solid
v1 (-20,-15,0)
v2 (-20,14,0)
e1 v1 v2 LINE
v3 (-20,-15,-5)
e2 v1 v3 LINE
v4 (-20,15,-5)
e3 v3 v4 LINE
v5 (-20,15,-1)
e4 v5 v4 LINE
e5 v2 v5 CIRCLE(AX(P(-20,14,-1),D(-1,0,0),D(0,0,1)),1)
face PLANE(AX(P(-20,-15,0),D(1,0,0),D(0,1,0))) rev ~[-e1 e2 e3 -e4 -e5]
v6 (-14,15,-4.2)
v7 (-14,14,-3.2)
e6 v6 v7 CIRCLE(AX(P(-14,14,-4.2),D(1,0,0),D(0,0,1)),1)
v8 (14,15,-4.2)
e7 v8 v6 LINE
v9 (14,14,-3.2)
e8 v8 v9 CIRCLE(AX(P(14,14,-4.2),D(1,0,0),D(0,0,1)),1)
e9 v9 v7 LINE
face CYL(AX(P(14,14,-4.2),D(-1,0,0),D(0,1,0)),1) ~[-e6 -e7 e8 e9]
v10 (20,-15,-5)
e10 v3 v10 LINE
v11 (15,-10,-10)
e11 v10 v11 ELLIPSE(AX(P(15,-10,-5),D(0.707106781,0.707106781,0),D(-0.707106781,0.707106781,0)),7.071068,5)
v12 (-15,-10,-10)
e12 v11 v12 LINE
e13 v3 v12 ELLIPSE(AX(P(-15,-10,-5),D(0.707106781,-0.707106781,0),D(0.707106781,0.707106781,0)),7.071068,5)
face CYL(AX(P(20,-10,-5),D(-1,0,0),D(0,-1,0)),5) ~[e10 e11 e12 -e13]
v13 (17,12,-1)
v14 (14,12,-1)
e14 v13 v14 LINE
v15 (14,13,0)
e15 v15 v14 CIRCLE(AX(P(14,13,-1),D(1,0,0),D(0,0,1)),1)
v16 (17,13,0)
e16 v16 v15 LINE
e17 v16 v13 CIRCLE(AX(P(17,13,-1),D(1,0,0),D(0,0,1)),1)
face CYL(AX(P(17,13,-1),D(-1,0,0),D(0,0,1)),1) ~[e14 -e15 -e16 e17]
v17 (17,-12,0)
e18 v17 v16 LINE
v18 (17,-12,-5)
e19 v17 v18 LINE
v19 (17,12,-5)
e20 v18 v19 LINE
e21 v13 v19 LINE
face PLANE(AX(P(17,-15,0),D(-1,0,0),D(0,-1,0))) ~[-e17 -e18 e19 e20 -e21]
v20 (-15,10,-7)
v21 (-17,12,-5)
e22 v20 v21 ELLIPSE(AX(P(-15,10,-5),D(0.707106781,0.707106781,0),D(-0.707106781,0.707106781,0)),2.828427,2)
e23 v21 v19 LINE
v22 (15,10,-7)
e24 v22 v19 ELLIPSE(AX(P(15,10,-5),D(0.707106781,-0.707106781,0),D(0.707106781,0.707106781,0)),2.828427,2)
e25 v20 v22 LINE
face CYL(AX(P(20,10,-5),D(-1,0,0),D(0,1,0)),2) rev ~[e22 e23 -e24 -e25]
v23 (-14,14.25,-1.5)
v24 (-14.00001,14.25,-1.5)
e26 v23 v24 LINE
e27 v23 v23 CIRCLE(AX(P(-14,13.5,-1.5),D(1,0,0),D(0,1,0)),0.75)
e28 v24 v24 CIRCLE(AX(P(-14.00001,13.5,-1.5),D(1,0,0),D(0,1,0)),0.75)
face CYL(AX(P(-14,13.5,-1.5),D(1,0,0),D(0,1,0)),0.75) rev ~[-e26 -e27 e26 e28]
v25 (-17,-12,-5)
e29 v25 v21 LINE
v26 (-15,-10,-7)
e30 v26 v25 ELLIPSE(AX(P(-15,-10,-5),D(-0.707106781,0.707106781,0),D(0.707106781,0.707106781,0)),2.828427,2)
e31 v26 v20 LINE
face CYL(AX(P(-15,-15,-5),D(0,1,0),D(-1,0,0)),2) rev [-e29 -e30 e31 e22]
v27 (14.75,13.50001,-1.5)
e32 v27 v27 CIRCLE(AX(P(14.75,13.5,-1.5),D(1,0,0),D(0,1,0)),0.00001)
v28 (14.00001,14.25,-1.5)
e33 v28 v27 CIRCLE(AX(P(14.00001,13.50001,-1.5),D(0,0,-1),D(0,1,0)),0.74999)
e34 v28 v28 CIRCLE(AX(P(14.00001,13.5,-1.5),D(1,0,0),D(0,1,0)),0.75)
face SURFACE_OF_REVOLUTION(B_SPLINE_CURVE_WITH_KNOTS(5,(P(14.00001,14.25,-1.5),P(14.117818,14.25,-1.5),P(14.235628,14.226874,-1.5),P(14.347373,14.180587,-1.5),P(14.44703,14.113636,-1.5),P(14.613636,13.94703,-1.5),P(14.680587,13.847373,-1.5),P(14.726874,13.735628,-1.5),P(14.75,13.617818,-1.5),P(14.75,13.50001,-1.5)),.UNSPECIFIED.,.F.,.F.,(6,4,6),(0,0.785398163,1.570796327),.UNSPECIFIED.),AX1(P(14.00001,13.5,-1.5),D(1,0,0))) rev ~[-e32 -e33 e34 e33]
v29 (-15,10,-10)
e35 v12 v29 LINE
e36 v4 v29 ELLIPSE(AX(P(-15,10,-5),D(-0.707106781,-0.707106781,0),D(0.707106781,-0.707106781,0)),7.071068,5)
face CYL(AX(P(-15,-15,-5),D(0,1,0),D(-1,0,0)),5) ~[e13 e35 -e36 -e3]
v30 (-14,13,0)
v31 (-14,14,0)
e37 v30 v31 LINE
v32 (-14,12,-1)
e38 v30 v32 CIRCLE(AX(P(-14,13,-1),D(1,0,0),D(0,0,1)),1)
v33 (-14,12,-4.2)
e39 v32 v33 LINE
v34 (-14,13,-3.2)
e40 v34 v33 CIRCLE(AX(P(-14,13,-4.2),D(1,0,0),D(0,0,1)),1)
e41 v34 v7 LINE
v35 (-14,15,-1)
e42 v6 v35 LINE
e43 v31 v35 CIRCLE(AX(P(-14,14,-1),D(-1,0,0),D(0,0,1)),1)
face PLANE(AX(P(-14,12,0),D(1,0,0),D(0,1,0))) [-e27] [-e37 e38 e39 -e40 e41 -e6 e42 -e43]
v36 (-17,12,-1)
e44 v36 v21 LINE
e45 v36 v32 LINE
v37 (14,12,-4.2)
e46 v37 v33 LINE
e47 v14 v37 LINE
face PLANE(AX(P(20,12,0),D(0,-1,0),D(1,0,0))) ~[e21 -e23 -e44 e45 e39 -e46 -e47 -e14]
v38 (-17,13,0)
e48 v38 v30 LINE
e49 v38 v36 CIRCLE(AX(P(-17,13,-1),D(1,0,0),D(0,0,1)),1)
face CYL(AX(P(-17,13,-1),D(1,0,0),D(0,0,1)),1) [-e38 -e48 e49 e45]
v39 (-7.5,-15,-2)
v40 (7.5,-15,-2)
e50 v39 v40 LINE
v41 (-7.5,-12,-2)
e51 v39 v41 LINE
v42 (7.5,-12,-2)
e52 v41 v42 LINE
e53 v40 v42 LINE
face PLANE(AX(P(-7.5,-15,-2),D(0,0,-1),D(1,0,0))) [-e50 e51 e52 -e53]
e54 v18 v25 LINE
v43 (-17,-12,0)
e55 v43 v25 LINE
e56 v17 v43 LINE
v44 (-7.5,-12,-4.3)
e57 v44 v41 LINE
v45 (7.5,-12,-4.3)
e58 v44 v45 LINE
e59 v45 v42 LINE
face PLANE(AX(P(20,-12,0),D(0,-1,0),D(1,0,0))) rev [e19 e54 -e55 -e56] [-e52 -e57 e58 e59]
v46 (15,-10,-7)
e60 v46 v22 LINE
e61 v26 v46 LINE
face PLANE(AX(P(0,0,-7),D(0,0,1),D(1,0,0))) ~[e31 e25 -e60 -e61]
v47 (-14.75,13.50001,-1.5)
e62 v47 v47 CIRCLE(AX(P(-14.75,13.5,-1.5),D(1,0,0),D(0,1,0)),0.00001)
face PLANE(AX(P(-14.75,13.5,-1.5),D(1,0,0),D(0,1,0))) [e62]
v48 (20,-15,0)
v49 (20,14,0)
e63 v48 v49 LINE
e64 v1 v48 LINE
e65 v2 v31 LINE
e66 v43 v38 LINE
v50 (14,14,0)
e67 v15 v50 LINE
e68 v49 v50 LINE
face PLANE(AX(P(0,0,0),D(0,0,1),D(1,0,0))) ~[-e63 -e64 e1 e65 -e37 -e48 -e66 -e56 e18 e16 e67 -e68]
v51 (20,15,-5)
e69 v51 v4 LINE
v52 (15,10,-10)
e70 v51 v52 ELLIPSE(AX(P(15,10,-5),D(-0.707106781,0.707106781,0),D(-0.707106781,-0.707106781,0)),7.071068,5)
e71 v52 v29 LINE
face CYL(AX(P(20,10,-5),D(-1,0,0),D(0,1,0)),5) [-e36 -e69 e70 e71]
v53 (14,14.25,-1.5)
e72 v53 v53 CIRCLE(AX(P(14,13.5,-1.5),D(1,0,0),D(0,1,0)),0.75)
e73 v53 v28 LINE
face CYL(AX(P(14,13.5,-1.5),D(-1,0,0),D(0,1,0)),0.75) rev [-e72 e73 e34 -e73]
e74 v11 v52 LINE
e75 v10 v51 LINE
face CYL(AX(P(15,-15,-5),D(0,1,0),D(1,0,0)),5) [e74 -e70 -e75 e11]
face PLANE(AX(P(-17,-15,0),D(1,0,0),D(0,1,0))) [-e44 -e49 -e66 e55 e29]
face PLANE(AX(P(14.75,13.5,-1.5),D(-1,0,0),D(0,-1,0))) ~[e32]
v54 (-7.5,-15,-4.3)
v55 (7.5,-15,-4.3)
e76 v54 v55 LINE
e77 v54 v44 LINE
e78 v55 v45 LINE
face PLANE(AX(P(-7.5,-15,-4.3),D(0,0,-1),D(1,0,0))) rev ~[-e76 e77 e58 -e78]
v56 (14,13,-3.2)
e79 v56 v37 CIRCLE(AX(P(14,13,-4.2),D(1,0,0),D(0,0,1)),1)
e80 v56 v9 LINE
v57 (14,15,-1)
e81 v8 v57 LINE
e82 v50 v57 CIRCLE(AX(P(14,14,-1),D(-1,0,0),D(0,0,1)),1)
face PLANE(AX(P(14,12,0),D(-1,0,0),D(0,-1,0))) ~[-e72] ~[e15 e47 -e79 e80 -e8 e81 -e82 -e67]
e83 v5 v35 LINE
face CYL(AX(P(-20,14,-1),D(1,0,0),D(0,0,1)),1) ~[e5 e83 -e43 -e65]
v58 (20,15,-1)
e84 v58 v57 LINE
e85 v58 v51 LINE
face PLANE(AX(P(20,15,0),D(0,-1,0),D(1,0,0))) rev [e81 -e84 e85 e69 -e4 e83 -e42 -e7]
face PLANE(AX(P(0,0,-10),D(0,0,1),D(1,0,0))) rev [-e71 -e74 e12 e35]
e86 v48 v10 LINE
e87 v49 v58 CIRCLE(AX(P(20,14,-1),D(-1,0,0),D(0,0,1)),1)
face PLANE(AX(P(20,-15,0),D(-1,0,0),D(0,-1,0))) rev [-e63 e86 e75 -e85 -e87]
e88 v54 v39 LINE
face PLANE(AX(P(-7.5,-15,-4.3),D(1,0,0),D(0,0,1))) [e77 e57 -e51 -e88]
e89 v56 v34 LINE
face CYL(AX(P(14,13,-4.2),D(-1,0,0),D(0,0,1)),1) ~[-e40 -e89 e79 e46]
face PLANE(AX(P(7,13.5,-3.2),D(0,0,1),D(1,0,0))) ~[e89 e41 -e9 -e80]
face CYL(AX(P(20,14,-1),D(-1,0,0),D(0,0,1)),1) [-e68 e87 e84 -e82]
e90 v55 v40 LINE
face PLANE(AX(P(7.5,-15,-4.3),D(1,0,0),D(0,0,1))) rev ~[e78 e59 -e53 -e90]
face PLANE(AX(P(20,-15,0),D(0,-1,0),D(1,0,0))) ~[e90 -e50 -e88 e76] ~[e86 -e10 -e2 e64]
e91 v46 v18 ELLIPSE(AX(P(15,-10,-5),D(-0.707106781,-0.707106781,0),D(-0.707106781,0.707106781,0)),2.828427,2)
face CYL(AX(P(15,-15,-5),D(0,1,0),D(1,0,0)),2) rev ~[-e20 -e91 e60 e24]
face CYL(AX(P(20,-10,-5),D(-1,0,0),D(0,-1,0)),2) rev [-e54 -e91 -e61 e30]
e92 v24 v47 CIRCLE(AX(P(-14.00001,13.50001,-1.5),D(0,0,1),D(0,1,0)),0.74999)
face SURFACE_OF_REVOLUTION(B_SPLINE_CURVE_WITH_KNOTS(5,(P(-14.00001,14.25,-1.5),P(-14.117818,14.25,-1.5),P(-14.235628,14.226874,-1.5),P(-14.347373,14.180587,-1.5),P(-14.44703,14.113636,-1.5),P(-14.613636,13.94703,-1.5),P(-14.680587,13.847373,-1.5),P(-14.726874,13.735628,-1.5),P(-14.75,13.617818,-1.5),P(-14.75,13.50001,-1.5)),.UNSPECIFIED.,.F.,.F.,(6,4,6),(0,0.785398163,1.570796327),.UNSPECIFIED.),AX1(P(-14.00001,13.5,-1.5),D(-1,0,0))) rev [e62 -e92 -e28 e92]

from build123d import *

# Parameters (mm, degrees)
F0_W      = 40
F0_H      = 30
F1_DEPTH  = 10
F2_R      = 5
F3_T      = -3
F4_W      = 28
F4_H      = 3
F5_DEPTH  = 3
F6_W      = 32.3581136763
F6_H      = 60.2468792349
F7_DEPTH  = 25
F8_R      = 0.75
F9_DEPTH  = 0.75
F10_R     = 0.74999
F11_W     = 14
F11_H     = 3
F12_DEPTH = 0.2
F13_R     = 1
F15_W     = 15
F15_H     = 2.3
F16_DEPTH = 3


# Not quite as in the source:
# - a fillet or chamfer is up to 0.001 mm smaller than in the source, because OpenCascade refuses the exact size


with BuildPart() as f1:
    # F0 (on Top) → F1 (new body)
    with BuildSketch(Plane.XY):
        Rectangle(F0_W, F0_H)
    extrude(amount=-F1_DEPTH)

    # F2
    f2_edges = [f1.edges().sort_by_distance(p)[0] for p in [
        (20, 0, -10),
        (0, 15, -10),
        (-20, 0, -10),
        (0, -15, -10),
    ]]
    fillet(f2_edges, radius=F2_R)

    # F3
    f3_openings = [f1.faces().sort_by_distance(p)[0] for p in [
        (0, 0, 0),
    ]]
    offset(amount=F3_T, openings=f3_openings)

    # F4 (on face) → F5 (cut)
    with BuildSketch(Plane.XY):
        with Locations((0, 13.5)):
            Rectangle(F4_W, F4_H)
    extrude(amount=-F5_DEPTH, mode=Mode.SUBTRACT)

    # F6 (on Top) → F7 (cut)
    with BuildSketch(Plane.XY):
        with Locations((16.1790568382, -2.0559011027)):
            Rectangle(F6_W, F6_H)
    extrude(amount=-F7_DEPTH, mode=Mode.SUBTRACT)

    # F8 (on face) → F9 (cut)
    with BuildSketch(Plane.YZ.offset(-14)):
        with Locations((13.5, -1.5)):
            Circle(F8_R)
    extrude(amount=-F9_DEPTH, mode=Mode.SUBTRACT)

    # F10 (radius 0.75 in the source; OpenCascade refuses exactly that, so slightly less here)
    f10_edges = [f1.edges().sort_by_distance(p)[0] for p in [
        (-14.75, 12.75, -1.5),
    ]]
    fillet(f10_edges, radius=F10_R)

    # F11 (on face) → F12 (cut)
    with BuildSketch(Plane.XY.offset(-3)):
        with Locations((-7, 13.5)):
            Rectangle(F11_W, F11_H)
    extrude(amount=-F12_DEPTH, mode=Mode.SUBTRACT)

    # F13
    f13_edges = [f1.edges().sort_by_distance(p)[0] for p in [
        (-17, 15, 0),
        (-15.5, 12, 0),
        (-7, 15, -3.2),
        (-7, 12, -3.2),
    ]]
    fillet(f13_edges, radius=F13_R)

    # F14: F1 across plane


with BuildPart() as f1_1:
    add(f1.part)
    add(f1.part.mirror(Plane.YZ))

    # F15 (on face) → F16 (cut, through all)
    with BuildSketch(Plane.XZ.offset(15)):
        with Locations((0, -3.15)):
            Rectangle(F15_W, F15_H)
    extrude(amount=-F16_DEPTH, mode=Mode.SUBTRACT)


solid = f1_1.part
